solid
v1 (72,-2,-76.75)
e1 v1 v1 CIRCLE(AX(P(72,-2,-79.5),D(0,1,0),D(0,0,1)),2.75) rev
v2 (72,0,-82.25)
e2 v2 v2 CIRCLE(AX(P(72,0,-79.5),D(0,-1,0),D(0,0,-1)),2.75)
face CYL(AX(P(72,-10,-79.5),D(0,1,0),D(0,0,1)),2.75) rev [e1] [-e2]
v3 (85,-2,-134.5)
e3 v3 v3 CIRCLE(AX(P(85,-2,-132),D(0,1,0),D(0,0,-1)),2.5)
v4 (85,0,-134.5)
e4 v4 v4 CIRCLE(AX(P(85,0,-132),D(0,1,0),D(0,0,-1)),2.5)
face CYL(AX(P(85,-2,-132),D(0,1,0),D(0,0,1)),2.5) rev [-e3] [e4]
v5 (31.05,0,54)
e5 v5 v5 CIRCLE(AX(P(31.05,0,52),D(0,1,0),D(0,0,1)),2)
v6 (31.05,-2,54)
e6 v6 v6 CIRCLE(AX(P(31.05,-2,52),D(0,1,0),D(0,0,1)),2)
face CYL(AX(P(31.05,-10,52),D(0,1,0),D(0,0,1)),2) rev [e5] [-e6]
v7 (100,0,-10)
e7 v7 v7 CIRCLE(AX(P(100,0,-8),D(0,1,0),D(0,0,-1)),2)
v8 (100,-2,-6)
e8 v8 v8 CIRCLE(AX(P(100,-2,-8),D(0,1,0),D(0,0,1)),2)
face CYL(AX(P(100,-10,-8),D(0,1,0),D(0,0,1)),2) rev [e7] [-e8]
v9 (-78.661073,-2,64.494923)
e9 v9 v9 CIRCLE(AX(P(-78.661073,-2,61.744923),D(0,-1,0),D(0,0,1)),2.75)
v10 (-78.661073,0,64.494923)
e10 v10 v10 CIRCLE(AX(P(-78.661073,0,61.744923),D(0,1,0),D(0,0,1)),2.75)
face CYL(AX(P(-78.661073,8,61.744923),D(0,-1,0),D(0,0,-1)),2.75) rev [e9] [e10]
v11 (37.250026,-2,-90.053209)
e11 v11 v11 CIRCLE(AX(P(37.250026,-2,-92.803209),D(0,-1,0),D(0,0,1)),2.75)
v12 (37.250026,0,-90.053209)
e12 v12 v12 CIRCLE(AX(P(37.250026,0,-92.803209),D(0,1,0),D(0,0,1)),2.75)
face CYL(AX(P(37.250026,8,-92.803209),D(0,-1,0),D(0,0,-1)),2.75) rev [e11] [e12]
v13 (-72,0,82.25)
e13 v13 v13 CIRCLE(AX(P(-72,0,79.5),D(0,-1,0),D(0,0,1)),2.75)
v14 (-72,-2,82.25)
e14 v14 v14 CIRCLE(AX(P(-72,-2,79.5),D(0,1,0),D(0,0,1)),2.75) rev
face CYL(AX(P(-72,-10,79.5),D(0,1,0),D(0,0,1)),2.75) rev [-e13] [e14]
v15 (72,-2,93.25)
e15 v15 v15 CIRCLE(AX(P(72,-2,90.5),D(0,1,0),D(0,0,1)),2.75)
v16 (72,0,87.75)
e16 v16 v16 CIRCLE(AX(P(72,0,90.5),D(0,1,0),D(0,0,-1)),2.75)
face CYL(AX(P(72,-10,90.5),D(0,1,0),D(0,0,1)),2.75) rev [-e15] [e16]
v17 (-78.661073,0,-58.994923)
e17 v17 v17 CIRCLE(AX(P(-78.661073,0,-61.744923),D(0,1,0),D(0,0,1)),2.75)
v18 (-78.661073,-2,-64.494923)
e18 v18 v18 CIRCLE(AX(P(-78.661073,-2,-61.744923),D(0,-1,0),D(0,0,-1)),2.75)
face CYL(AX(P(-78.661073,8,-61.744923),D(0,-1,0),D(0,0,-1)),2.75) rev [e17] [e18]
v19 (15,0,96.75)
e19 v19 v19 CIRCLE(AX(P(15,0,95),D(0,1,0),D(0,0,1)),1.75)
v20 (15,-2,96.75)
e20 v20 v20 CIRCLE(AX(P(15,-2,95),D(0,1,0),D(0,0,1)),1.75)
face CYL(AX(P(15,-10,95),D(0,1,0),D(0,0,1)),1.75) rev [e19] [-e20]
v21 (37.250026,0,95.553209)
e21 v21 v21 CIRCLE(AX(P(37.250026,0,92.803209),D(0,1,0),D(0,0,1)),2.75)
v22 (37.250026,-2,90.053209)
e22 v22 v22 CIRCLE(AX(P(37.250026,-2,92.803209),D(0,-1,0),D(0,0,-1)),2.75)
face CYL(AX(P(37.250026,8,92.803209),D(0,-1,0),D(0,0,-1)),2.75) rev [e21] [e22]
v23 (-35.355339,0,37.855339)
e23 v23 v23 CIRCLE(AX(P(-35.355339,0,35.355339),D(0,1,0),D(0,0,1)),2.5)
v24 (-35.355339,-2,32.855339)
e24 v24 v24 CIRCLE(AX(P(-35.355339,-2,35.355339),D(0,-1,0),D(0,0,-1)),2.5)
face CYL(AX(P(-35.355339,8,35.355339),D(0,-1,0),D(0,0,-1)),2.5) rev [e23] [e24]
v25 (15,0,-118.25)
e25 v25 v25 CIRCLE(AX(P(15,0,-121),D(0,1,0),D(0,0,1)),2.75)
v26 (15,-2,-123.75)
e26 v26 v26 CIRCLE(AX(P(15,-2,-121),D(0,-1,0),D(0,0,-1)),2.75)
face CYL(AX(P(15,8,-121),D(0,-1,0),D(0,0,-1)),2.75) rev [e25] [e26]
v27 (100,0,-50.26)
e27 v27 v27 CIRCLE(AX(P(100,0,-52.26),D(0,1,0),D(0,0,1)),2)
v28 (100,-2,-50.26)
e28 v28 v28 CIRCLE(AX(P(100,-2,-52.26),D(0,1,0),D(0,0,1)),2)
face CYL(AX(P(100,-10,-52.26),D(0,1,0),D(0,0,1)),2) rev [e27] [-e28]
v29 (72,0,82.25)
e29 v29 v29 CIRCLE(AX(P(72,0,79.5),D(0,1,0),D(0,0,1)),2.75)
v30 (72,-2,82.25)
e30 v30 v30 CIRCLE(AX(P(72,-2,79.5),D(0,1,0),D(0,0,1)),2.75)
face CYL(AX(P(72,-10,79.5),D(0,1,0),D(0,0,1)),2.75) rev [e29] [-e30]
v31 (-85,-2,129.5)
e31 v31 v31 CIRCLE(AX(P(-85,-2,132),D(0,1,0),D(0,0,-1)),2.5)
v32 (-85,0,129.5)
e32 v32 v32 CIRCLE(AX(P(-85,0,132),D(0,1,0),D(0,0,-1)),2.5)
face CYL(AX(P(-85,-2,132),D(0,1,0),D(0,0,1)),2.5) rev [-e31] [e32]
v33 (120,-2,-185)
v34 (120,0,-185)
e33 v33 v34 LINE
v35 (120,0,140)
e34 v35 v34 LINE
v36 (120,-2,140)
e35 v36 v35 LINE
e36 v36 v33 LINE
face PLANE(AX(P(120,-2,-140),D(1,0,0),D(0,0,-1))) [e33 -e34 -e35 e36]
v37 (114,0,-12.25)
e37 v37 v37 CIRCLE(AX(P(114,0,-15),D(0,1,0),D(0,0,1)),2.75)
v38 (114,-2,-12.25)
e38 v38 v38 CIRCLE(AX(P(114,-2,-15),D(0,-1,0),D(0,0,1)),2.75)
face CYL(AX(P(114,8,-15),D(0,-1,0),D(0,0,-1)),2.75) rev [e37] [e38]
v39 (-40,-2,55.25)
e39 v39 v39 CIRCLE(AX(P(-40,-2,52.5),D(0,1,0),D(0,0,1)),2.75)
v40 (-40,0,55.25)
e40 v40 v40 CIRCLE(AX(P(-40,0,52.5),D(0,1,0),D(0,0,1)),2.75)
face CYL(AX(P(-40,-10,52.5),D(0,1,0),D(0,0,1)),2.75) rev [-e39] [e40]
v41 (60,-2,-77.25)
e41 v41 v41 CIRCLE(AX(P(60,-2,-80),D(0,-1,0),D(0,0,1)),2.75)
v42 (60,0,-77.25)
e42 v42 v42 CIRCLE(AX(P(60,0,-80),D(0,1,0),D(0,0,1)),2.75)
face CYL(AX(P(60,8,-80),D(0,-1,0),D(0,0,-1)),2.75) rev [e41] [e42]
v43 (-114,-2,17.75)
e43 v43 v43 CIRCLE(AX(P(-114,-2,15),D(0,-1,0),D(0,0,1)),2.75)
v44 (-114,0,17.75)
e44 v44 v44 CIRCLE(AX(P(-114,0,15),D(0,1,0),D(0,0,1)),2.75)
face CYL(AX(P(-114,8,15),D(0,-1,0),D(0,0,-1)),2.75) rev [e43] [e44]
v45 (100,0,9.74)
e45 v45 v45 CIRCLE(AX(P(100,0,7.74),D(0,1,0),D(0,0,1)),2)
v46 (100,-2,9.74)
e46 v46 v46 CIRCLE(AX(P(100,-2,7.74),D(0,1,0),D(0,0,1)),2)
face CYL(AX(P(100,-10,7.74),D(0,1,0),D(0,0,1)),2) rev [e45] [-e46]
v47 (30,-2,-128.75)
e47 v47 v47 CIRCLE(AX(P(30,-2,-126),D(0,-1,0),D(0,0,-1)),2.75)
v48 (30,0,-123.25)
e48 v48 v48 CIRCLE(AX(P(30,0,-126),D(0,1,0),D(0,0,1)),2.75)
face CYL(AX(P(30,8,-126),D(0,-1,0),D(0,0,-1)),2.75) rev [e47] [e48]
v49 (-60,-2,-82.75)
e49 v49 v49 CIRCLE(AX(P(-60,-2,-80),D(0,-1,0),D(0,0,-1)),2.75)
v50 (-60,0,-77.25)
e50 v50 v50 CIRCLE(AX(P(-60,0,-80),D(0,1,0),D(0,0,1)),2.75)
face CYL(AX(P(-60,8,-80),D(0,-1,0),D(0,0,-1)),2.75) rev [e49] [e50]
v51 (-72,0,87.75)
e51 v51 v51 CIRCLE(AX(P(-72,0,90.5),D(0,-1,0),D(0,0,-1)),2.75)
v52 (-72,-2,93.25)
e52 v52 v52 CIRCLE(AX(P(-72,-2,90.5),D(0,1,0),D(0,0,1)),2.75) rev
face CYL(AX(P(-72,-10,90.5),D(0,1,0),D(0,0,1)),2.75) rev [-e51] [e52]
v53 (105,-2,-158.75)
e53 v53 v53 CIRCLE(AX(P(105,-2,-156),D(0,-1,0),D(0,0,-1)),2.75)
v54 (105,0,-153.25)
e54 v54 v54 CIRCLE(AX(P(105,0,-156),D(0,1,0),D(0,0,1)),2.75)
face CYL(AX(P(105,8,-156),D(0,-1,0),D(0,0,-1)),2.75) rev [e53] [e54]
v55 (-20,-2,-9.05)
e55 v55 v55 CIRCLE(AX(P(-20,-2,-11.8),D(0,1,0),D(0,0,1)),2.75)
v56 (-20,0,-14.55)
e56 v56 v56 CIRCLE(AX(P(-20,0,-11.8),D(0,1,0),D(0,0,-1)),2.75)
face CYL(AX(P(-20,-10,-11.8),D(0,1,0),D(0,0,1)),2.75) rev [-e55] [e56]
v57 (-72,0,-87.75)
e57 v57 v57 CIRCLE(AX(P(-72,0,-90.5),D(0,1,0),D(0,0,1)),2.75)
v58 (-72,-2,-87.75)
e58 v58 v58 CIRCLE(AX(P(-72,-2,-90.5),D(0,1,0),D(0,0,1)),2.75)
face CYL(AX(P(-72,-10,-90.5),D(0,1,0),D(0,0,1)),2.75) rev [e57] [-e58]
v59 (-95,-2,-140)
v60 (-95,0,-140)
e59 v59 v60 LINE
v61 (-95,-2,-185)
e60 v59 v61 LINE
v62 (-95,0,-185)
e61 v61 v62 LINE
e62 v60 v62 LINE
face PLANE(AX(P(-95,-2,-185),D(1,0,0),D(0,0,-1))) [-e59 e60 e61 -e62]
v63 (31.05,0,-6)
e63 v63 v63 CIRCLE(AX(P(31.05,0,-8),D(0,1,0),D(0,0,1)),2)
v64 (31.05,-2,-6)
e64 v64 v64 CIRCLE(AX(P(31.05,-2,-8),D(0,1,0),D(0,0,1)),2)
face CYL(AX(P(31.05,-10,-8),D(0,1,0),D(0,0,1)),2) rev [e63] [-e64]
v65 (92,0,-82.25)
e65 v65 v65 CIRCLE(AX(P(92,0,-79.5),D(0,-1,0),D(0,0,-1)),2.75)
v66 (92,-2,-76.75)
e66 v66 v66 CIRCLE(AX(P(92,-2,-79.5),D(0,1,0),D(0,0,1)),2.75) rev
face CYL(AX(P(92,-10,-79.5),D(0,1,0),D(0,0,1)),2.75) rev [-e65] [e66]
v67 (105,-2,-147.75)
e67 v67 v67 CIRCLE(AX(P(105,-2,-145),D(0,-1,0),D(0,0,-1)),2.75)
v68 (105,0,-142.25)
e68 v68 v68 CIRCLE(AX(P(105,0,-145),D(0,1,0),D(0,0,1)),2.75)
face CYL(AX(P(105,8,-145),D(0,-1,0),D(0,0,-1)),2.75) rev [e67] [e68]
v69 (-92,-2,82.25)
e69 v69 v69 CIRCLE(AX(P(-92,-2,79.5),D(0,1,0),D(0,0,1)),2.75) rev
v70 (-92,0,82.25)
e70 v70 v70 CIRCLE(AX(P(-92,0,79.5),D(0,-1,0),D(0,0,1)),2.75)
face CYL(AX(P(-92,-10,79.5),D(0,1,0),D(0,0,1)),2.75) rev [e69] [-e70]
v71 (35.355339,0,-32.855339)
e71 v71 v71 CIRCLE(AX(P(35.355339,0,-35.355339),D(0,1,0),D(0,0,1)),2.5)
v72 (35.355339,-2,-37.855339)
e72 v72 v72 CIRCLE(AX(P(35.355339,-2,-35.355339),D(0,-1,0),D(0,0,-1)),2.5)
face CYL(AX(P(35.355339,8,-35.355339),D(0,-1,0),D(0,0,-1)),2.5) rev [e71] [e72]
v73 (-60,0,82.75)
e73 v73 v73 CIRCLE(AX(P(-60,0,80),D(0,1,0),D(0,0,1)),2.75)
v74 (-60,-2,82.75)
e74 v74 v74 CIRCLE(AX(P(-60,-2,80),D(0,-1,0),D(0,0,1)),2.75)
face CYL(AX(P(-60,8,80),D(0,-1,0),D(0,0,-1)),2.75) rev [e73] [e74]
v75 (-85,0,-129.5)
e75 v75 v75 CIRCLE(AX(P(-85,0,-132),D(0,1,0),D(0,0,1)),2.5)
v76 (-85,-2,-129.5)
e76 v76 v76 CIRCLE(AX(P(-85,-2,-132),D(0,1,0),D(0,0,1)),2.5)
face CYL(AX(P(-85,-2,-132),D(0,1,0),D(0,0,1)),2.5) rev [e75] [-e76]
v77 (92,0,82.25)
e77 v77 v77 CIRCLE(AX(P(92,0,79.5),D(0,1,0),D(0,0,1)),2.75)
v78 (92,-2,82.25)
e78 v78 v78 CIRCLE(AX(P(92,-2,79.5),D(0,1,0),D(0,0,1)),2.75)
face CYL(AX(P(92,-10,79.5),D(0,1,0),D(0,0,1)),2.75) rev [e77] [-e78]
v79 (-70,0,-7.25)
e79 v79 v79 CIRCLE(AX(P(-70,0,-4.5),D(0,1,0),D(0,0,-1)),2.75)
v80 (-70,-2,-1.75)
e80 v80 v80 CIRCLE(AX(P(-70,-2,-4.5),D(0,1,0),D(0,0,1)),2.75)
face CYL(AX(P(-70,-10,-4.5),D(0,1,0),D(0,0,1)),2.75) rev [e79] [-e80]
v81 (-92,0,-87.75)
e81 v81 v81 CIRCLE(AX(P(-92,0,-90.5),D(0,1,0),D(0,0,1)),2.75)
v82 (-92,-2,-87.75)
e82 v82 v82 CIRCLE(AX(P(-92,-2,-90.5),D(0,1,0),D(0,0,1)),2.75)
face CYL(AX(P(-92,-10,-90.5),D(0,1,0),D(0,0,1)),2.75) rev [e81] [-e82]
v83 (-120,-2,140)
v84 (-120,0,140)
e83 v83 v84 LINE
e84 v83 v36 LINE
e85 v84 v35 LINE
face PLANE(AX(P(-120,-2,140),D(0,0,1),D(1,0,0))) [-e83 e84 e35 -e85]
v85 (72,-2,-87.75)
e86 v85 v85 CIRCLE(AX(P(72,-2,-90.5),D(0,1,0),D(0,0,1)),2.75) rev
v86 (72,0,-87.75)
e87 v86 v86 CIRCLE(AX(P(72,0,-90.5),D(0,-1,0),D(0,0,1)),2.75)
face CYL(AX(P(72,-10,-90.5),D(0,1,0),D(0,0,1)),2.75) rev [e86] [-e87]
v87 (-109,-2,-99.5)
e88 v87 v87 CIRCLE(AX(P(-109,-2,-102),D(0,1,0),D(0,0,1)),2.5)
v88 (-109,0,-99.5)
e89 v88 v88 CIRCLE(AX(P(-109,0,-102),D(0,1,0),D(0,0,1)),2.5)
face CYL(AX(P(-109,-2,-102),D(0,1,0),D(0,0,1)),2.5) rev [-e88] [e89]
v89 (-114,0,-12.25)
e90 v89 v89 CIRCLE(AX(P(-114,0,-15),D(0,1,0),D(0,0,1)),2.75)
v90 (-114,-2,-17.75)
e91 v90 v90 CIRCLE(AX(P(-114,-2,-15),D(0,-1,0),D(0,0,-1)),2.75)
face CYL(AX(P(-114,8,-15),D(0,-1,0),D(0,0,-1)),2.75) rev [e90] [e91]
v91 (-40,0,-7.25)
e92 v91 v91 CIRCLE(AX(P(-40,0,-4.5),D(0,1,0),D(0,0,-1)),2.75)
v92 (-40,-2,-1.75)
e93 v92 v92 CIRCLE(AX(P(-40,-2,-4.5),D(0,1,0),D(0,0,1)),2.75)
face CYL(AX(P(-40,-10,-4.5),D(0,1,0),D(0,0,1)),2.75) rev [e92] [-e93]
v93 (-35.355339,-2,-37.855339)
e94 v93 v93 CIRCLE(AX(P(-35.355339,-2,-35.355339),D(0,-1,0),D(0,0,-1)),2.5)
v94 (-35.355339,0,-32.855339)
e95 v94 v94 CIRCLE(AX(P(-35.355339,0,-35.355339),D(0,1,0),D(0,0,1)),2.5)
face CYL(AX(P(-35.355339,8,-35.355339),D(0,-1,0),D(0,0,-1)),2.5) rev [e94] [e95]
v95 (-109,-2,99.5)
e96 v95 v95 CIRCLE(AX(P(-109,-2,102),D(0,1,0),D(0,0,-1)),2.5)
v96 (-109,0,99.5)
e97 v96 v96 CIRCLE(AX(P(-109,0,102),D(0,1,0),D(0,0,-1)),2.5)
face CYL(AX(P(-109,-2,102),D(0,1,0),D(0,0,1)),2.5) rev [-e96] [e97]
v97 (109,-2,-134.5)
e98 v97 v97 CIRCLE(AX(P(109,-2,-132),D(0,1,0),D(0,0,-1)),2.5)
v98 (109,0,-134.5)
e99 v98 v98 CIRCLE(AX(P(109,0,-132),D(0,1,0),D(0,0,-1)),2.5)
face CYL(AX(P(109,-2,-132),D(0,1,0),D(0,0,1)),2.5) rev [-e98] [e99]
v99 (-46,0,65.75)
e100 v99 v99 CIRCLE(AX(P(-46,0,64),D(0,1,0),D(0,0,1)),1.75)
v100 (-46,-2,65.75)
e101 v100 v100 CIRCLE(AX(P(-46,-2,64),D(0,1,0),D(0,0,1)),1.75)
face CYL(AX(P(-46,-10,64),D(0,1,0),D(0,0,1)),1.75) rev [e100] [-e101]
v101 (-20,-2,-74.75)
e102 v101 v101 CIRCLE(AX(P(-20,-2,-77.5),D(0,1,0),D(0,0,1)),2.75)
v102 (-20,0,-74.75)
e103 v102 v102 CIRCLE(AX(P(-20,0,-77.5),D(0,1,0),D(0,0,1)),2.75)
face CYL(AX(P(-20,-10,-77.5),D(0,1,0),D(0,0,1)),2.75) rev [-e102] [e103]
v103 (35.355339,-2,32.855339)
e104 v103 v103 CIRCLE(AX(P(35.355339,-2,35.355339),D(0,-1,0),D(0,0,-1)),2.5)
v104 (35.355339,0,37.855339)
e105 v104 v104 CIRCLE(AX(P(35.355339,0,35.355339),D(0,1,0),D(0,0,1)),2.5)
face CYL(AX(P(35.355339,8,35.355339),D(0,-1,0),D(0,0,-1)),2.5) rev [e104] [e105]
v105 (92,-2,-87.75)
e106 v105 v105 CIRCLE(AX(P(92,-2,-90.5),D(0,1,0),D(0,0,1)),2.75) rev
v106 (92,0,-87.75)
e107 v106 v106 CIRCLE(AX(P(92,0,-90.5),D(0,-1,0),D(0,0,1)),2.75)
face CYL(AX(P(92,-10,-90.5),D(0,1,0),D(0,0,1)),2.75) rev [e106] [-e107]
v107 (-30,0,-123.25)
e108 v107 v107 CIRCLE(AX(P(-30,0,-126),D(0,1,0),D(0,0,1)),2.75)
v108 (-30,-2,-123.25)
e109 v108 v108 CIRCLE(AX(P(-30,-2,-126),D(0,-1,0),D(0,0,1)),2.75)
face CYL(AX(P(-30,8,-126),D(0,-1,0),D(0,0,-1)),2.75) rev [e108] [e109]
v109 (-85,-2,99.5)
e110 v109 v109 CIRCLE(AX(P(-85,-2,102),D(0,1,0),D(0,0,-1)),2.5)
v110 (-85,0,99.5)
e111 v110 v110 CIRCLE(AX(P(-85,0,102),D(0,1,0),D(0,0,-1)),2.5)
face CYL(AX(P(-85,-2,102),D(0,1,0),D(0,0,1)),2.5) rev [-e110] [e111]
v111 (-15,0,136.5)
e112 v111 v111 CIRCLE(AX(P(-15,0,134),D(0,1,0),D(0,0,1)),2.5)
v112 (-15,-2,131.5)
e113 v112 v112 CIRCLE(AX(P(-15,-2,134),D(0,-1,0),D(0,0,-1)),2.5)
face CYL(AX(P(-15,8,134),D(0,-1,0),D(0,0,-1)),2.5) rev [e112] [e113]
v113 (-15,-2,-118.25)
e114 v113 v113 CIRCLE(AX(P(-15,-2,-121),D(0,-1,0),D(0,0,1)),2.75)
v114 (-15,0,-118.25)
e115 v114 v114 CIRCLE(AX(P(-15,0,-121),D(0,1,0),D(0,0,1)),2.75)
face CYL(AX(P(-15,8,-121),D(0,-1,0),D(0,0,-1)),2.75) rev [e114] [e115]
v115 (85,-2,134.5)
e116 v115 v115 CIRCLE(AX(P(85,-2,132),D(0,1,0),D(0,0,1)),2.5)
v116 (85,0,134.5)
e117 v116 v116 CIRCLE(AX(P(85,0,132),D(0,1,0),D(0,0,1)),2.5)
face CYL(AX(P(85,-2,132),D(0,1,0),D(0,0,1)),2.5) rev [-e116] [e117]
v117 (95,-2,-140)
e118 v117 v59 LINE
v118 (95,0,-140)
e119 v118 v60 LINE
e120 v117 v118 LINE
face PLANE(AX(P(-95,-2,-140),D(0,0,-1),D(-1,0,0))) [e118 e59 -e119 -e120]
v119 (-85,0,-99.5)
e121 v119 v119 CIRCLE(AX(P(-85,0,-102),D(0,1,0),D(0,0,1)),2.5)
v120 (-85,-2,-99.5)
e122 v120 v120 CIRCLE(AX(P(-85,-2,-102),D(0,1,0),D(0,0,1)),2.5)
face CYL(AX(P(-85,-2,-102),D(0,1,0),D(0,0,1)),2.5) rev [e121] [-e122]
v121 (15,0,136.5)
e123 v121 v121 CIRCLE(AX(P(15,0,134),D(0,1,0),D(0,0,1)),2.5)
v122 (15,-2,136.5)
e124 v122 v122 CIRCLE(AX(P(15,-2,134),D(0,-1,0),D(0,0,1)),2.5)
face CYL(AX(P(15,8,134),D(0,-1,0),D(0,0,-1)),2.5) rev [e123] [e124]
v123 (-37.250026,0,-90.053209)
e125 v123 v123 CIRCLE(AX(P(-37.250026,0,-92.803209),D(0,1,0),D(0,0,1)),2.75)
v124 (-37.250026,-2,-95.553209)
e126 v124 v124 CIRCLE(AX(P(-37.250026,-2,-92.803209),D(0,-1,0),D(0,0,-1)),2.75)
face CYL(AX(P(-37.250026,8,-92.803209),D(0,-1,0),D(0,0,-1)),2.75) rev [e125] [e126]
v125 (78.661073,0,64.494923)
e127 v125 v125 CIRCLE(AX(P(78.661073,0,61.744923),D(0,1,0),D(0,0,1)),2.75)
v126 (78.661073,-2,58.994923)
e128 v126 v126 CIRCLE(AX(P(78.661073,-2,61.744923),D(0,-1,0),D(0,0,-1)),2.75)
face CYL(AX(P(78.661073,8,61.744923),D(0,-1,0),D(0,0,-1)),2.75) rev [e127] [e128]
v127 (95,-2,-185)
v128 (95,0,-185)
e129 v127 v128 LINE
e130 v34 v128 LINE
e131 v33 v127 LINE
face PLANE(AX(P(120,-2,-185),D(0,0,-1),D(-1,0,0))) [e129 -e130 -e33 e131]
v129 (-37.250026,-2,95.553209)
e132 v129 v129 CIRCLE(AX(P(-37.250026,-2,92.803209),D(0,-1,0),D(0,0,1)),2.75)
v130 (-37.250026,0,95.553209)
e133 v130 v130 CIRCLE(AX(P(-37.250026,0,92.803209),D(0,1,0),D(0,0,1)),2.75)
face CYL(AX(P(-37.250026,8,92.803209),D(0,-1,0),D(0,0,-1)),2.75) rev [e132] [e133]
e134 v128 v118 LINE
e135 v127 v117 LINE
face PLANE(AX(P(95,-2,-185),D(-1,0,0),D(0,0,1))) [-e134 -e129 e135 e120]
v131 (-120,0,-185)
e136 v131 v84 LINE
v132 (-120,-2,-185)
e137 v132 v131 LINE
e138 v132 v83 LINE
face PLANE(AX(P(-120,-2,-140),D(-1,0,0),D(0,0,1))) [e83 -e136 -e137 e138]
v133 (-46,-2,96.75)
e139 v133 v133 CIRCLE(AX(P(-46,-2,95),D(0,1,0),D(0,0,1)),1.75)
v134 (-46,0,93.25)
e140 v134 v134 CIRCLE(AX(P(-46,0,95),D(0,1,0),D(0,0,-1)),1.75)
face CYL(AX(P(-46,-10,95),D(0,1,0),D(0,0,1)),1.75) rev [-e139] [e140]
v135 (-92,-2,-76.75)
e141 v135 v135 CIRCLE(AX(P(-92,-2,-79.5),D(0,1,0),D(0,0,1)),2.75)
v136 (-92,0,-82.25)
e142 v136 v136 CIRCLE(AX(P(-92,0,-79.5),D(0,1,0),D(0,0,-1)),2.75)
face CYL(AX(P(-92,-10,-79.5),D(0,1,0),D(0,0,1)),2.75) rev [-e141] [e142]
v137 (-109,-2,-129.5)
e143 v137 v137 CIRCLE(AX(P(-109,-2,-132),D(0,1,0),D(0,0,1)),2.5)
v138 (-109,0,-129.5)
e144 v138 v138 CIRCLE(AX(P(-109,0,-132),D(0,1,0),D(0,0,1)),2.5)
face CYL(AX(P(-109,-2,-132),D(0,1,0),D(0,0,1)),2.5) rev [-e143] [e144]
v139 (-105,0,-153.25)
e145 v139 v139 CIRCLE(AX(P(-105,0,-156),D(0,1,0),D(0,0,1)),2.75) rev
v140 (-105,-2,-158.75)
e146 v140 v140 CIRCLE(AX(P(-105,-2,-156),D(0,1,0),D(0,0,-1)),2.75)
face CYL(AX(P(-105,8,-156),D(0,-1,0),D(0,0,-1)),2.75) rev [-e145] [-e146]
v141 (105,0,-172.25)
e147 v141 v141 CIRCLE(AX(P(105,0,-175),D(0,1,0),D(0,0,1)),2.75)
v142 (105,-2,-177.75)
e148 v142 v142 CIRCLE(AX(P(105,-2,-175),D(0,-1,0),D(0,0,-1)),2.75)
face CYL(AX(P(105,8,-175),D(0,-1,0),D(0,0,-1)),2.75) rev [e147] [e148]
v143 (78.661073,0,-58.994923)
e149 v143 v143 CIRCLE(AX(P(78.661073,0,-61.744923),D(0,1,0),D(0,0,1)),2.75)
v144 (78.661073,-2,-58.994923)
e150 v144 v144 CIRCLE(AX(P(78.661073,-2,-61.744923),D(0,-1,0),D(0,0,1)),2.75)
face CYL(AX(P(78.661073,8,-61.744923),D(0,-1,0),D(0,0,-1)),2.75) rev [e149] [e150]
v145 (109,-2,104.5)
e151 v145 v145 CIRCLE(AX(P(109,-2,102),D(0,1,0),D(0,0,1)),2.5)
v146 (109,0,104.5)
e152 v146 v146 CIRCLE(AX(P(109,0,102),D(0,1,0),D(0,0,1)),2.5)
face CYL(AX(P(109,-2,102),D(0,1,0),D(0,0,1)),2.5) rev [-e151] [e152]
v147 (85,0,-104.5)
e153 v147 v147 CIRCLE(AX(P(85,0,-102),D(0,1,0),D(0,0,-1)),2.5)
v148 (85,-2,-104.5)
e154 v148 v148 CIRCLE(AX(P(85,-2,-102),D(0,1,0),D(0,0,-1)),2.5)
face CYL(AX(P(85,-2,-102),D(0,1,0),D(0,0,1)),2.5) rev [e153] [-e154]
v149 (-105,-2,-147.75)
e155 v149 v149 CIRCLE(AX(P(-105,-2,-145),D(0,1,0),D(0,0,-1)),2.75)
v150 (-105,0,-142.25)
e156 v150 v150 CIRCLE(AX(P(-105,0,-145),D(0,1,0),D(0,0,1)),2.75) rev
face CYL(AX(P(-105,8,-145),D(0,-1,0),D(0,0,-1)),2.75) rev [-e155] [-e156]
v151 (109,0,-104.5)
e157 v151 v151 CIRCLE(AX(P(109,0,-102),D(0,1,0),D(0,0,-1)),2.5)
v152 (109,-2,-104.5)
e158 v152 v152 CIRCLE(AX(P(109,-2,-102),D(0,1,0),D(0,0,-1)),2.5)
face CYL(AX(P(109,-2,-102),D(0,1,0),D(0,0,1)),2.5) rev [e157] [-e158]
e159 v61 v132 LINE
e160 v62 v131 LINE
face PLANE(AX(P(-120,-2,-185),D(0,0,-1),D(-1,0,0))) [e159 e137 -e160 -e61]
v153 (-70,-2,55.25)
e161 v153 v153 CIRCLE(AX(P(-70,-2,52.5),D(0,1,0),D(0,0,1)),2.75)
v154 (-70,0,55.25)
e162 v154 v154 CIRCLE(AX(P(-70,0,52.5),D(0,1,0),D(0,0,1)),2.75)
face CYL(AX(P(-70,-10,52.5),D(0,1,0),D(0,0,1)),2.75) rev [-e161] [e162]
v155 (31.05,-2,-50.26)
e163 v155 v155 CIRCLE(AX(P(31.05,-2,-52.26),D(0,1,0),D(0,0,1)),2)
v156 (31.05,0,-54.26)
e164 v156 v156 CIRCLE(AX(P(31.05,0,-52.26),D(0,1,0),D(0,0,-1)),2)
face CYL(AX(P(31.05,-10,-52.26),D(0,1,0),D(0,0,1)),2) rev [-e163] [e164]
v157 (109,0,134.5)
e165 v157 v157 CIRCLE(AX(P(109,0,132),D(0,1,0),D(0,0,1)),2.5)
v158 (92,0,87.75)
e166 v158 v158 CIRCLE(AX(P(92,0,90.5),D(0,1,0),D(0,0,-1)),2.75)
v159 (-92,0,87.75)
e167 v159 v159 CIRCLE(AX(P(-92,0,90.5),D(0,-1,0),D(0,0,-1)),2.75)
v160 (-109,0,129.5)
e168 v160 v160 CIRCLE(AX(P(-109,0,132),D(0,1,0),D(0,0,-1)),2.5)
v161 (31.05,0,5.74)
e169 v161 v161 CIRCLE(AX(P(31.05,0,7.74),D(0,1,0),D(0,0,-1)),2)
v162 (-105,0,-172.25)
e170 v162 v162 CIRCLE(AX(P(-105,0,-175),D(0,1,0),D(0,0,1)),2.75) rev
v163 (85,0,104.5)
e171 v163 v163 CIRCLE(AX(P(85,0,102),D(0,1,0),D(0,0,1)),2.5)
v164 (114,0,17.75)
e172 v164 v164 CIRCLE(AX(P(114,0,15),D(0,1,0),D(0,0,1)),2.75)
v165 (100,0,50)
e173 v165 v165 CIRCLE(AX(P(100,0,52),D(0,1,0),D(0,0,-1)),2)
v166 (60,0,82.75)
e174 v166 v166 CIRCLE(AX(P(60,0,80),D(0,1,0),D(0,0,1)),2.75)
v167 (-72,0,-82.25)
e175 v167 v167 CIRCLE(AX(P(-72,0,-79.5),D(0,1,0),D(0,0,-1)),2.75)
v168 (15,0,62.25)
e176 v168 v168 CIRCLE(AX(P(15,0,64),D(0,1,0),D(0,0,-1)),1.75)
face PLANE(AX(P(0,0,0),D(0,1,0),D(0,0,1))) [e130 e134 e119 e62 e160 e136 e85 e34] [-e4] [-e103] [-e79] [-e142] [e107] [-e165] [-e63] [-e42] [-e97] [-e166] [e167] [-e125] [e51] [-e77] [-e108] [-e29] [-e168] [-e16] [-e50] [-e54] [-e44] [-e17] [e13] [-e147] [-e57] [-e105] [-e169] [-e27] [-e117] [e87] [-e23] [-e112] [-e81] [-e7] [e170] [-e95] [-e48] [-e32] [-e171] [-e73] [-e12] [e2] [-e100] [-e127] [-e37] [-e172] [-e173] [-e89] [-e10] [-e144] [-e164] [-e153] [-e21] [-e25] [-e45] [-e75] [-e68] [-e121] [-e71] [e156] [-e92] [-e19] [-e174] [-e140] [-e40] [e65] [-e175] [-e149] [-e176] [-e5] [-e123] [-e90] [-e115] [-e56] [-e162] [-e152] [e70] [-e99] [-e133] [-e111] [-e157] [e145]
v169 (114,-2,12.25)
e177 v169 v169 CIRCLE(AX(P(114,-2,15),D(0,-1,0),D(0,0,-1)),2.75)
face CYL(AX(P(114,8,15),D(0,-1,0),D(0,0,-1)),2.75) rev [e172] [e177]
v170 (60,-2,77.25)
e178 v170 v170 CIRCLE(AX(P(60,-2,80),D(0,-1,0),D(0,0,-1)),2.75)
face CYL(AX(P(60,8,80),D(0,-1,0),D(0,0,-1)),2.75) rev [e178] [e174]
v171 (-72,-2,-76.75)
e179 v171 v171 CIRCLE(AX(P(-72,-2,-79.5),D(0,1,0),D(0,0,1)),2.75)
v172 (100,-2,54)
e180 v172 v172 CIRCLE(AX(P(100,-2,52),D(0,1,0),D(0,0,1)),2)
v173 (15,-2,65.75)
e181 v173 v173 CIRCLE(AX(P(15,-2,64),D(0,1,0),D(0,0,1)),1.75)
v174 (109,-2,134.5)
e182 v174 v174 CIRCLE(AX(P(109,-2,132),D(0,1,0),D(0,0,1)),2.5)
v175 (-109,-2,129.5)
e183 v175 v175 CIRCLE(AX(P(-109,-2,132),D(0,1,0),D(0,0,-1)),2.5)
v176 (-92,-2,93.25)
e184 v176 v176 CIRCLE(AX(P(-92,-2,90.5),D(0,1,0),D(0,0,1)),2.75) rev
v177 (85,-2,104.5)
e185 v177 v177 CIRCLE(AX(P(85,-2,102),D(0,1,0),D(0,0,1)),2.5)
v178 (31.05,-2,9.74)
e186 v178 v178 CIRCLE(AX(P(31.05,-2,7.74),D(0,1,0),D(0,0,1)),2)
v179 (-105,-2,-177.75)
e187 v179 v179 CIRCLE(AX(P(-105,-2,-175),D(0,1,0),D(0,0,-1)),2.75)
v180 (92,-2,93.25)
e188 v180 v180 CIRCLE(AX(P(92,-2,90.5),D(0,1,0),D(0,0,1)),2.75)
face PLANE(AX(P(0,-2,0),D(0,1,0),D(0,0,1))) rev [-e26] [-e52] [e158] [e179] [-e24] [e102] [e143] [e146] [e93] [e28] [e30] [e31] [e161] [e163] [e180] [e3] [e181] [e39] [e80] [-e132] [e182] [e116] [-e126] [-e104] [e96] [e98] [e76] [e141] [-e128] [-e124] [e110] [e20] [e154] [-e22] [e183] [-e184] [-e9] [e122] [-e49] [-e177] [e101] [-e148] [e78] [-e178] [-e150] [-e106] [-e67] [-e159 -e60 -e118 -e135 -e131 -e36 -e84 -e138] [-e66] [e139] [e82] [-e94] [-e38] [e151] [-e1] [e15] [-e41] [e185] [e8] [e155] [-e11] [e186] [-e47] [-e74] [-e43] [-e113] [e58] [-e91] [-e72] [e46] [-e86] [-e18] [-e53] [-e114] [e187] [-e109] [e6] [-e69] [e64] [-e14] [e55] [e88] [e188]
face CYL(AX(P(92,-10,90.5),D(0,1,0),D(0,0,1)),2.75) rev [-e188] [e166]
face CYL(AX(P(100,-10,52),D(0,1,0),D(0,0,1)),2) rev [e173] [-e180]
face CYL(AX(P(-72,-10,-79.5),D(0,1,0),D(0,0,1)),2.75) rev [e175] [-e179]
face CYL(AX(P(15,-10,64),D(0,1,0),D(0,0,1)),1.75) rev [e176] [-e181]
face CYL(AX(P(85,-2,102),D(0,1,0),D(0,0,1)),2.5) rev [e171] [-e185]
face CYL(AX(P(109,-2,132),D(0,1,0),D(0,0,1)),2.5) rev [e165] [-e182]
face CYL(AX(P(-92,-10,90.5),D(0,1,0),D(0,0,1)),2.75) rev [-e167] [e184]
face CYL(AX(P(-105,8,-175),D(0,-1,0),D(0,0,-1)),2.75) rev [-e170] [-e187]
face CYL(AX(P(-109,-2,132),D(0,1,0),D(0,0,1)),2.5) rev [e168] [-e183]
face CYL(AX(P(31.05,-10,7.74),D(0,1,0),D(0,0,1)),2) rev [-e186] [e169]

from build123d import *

# Parameters (mm, degrees)
SM_BASE_FLANGE_2_DEPTH   = 2
SKETCH_26_R              = 2.5
CUT_EXTRUDE_1_DEPTH      = 221.519840377
SKETCH_27_R              = 2.5
CUT_EXTRUDE_2_DEPTH      = 10
SKETCH_28_R              = 2.75
CUT_EXTRUDE_3_DEPTH      = 10
SKETCH_29_R              = 2.75
CUT_EXTRUDE_4_DEPTH      = 10
SKETCH_30_R              = 2.75
CUT_EXTRUDE_5_DEPTH      = 10
MIRROR_3_COPY_1_SKETCH_R = 2.75
MIRROR_3_COPY_1_DEPTH    = 10
SKETCH_31_R              = 2
CUT_EXTRUDE_6_DEPTH      = 10
PATTERN_LINEAR_1_COUNT   = 2
PATTERN_LINEAR_1_PITCH   = 60
SKETCH_32_R              = 2.75
CUT_EXTRUDE_7_DEPTH      = 10
SKETCH_33_R              = 2.75
CUT_EXTRUDE_8_DEPTH      = 10
SKETCH_34_R              = 1.75
CUT_EXTRUDE_9_DEPTH      = 10
SKETCH_35_R              = 2.75
CUT_EXTRUDE_10_DEPTH     = 10
SKETCH_36_R              = 2.75
SKETCH_36_R_2            = 2.5
CUT_EXTRUDE_11_DEPTH     = 10


# Sheet-metal steps are written as plain solids
with BuildPart() as part:
    # 草图2 → 基体-法兰2 (new body)
    with BuildSketch(Plane(origin=(0, 0, 0), x_dir=(1, 0, 0), z_dir=(0, 1, 0))):
        Polygon((-120, 140), (-120, 185), (-95, 185), (-95, 140), (95, 140), (95, 185), (120, 185), (120, 140), (120, -140), (-120, -140), align=None)
    extrude(amount=-SM_BASE_FLANGE_2_DEPTH)

    # 草图26 → 切除-拉伸1 (cut, through all)
    with BuildSketch(Plane(origin=(0, 0, 0), x_dir=(1, 0, 0), z_dir=(0, 1, 0))):
        with Locations(Location((-109, 102, 0), (0, 0, 270))):
            Circle(SKETCH_26_R)
        with Locations(Location((-109, 132, 0), (0, 0, 270))):
            Circle(SKETCH_26_R)
        with Locations(Location((-85, 132, 0), (0, 0, 270))):
            Circle(SKETCH_26_R)
        with Locations(Location((-85, 102, 0), (0, 0, 270))):
            Circle(SKETCH_26_R)
        with Locations(Location((-85, -102, 0), (0, 0, 90))):
            Circle(SKETCH_26_R)
        with Locations(Location((-85, -132, 0), (0, 0, 90))):
            Circle(SKETCH_26_R)
        with Locations(Location((-109, -132, 0), (0, 0, 90))):
            Circle(SKETCH_26_R)
        with Locations(Location((-109, -102, 0), (0, 0, 90))):
            Circle(SKETCH_26_R)
        with Locations(Location((85, 102, 0), (0, 0, 90))):
            Circle(SKETCH_26_R)
        with Locations(Location((85, 132, 0), (0, 0, 90))):
            Circle(SKETCH_26_R)
        with Locations(Location((109, 132, 0), (0, 0, 90))):
            Circle(SKETCH_26_R)
        with Locations(Location((109, 102, 0), (0, 0, 90))):
            Circle(SKETCH_26_R)
        with Locations(Location((109, -102, 0), (0, 0, 270))):
            Circle(SKETCH_26_R)
        with Locations(Location((109, -132, 0), (0, 0, 270))):
            Circle(SKETCH_26_R)
        with Locations(Location((85, -132, 0), (0, 0, 270))):
            Circle(SKETCH_26_R)
        with Locations(Location((85, -102, 0), (0, 0, 270))):
            Circle(SKETCH_26_R)
    extrude(amount=-CUT_EXTRUDE_1_DEPTH, mode=Mode.SUBTRACT)

    # 草图27 → 切除-拉伸2 (cut)
    with BuildSketch(Plane.XZ.offset(2)):
        with Locations(Location((-35.355339059, 35.355339059, 0), (0, 0, 270))):
            Circle(SKETCH_27_R)
        with Locations(Location((35.355339059, 35.355339059, 0), (0, 0, 270))):
            Circle(SKETCH_27_R)
        with Locations(Location((35.355339059, -35.355339059, 0), (0, 0, 270))):
            Circle(SKETCH_27_R)
        with Locations(Location((-35.355339059, -35.355339059, 0), (0, 0, 270))):
            Circle(SKETCH_27_R)
    extrude(amount=-CUT_EXTRUDE_2_DEPTH, mode=Mode.SUBTRACT)

    # 草图28 → 切除-拉伸3 (cut)
    with BuildSketch(Plane.XZ.offset(2)):
        with Locations(Location((-60, -80, 0), (0, 0, 270))):
            Circle(SKETCH_28_R)
        with Locations(Location((-37.250025969, -92.803208809, 0), (0, 0, 270))):
            Circle(SKETCH_28_R)
        with Locations(Location((-78.661073186, -61.744923397, 0), (0, 0, 270))):
            Circle(SKETCH_28_R)
        with Locations(Location((78.661073186, -61.744923397, 0), (0, 0, 90))):
            Circle(SKETCH_28_R)
        with Locations(Location((37.250025969, -92.803208809, 0), (0, 0, 90))):
            Circle(SKETCH_28_R)
        with Locations(Location((60, -80, 0), (0, 0, 90))):
            Circle(SKETCH_28_R)
        with Locations(Location((-78.661073186, 61.744923397, 0), (0, 0, 90))):
            Circle(SKETCH_28_R)
        with Locations(Location((-37.250025969, 92.803208809, 0), (0, 0, 90))):
            Circle(SKETCH_28_R)
        with Locations(Location((-60, 80, 0), (0, 0, 90))):
            Circle(SKETCH_28_R)
        with Locations(Location((60, 80, 0), (0, 0, 270))):
            Circle(SKETCH_28_R)
        with Locations(Location((37.250025969, 92.803208809, 0), (0, 0, 270))):
            Circle(SKETCH_28_R)
        with Locations(Location((78.661073186, 61.744923397, 0), (0, 0, 270))):
            Circle(SKETCH_28_R)
    extrude(amount=-CUT_EXTRUDE_3_DEPTH, mode=Mode.SUBTRACT)

    # 草图29 → 切除-拉伸4 (cut)
    with BuildSketch(Plane.XZ.offset(2)):
        with Locations(Location((105, -175, 0), (0, 0, 270))):
            Circle(SKETCH_29_R)
        with Locations(Location((105, -156, 0), (0, 0, 270))):
            Circle(SKETCH_29_R)
        with Locations(Location((105, -145, 0), (0, 0, 270))):
            Circle(SKETCH_29_R)
    cut_extrude_4 = extrude(amount=-CUT_EXTRUDE_4_DEPTH, mode=Mode.SUBTRACT)

    # 镜向1: 切除-拉伸4 across plane
    add(cut_extrude_4.mirror(Plane(origin=(0, 0, 0), x_dir=(0, 0, 1), z_dir=(1, 0, 0))), mode=Mode.SUBTRACT)

    # 草图30 → 切除-拉伸5 (cut)
    with BuildSketch(Plane(origin=(0, 0, 0), x_dir=(1, 0, 0), z_dir=(0, 1, 0))):
        with Locations(Location((-92, 90.5, 0), (0, 0, 270))):
            Circle(SKETCH_30_R)
        with Locations(Location((-92, 79.5, 0), (0, 0, 270))):
            Circle(SKETCH_30_R)
        with Locations(Location((-72, 79.5, 0), (0, 0, 270))):
            Circle(SKETCH_30_R)
        with Locations(Location((-72, 90.5, 0), (0, 0, 270))):
            Circle(SKETCH_30_R)
    cut_extrude_5 = extrude(amount=-CUT_EXTRUDE_5_DEPTH, mode=Mode.SUBTRACT)

    # 镜向2: 切除-拉伸5 across plane
    add(cut_extrude_5.mirror(Plane.XY), mode=Mode.SUBTRACT)

    # 镜向3: 切除-拉伸5 across plane
    add(cut_extrude_5.mirror(Plane(origin=(0, 0, 0), x_dir=(0, 0, 1), z_dir=(1, 0, 0))), mode=Mode.SUBTRACT)

    # 镜向3 copy 1 sketch → 镜向3 copy 1 (cut)
    with BuildSketch(Plane(origin=(0, 0, 0), x_dir=(-1, 0, 0), z_dir=(0, 1, 0))):
        with Locations(Location((-92, 90.5, 0), (0, 0, 270))):
            Circle(MIRROR_3_COPY_1_SKETCH_R)
        with Locations(Location((-92, 79.5, 0), (0, 0, 270))):
            Circle(MIRROR_3_COPY_1_SKETCH_R)
        with Locations(Location((-72, 79.5, 0), (0, 0, 270))):
            Circle(MIRROR_3_COPY_1_SKETCH_R)
        with Locations(Location((-72, 90.5, 0), (0, 0, 270))):
            Circle(MIRROR_3_COPY_1_SKETCH_R)
    extrude(amount=-MIRROR_3_COPY_1_DEPTH, mode=Mode.SUBTRACT)

    # 草图31 → 切除-拉伸6 (cut)
    with BuildSketch(Plane(origin=(0, 0, 0), x_dir=(1, 0, 0), z_dir=(0, 1, 0))):
        with Locations(Location((31.05, -52, 0), (0, 0, 270))):
            Circle(SKETCH_31_R)
        with Locations(Location((31.05, -7.74, 0), (0, 0, 270))):
            Circle(SKETCH_31_R)
        with Locations(Location((100, -7.74, 0), (0, 0, 270))):
            Circle(SKETCH_31_R)
        with Locations(Location((100, -52, 0), (0, 0, 270))):
            Circle(SKETCH_31_R)
    cut_extrude_6 = extrude(amount=-CUT_EXTRUDE_6_DEPTH, mode=Mode.SUBTRACT)

    # 阵列(线性)1: 切除-拉伸6 ×2
    with Locations(*[(0, 0, -i * PATTERN_LINEAR_1_PITCH) for i in range(1, PATTERN_LINEAR_1_COUNT)]):
        add(cut_extrude_6, mode=Mode.SUBTRACT)

    # 草图32 → 切除-拉伸7 (cut)
    with BuildSketch(Plane(origin=(0, 0, 0), x_dir=(1, 0, 0), z_dir=(0, 1, 0))):
        with Locations(Location((-20, 77.5, 0), (0, 0, 270))):
            Circle(SKETCH_32_R)
        with Locations(Location((-20, 11.8, 0), (0, 0, 270))):
            Circle(SKETCH_32_R)
    extrude(amount=-CUT_EXTRUDE_7_DEPTH, mode=Mode.SUBTRACT)

    # 草图33 → 切除-拉伸8 (cut)
    with BuildSketch(Plane(origin=(0, 0, 0), x_dir=(1, 0, 0), z_dir=(0, 1, 0))):
        with Locations(Location((-70, -52.5, 0), (0, 0, 270))):
            Circle(SKETCH_33_R)
        with Locations(Location((-70, 4.5, 0), (0, 0, 270))):
            Circle(SKETCH_33_R)
        with Locations(Location((-40, 4.5, 0), (0, 0, 270))):
            Circle(SKETCH_33_R)
        with Locations(Location((-40, -52.5, 0), (0, 0, 270))):
            Circle(SKETCH_33_R)
    extrude(amount=-CUT_EXTRUDE_8_DEPTH, mode=Mode.SUBTRACT)

    # 草图34 → 切除-拉伸9 (cut)
    with BuildSketch(Plane(origin=(0, 0, 0), x_dir=(1, 0, 0), z_dir=(0, 1, 0))):
        with Locations(Location((15, -95, 0), (0, 0, 270))):
            Circle(SKETCH_34_R)
        with Locations(Location((15, -64, 0), (0, 0, 270))):
            Circle(SKETCH_34_R)
        with Locations(Location((-46, -64, 0), (0, 0, 270))):
            Circle(SKETCH_34_R)
        with Locations(Location((-46, -95, 0), (0, 0, 270))):
            Circle(SKETCH_34_R)
    extrude(amount=-CUT_EXTRUDE_9_DEPTH, mode=Mode.SUBTRACT)

    # 草图35 → 切除-拉伸10 (cut)
    with BuildSketch(Plane.XZ.offset(2)):
        with Locations(Location((30, -126, 0), (0, 0, 270))):
            Circle(SKETCH_35_R)
        with Locations(Location((-30, -126, 0), (0, 0, 90))):
            Circle(SKETCH_35_R)
    extrude(amount=-CUT_EXTRUDE_10_DEPTH, mode=Mode.SUBTRACT)

    # 草图36 → 切除-拉伸11 (cut)
    with BuildSketch(Plane.XZ.offset(2)):
        with Locations(Location((-114, -15, 0), (0, 0, 270))):
            Circle(SKETCH_36_R)
        with Locations(Location((-114, 15, 0), (0, 0, 90))):
            Circle(SKETCH_36_R)
        with Locations(Location((114, -15, 0), (0, 0, 90))):
            Circle(SKETCH_36_R)
        with Locations(Location((114, 15, 0), (0, 0, 270))):
            Circle(SKETCH_36_R)
        with Locations(Location((15, 134, 0), (0, 0, 90))):
            Circle(SKETCH_36_R_2)
        with Locations(Location((-15, 134, 0), (0, 0, 270))):
            Circle(SKETCH_36_R_2)
        with Locations(Location((15, -121, 0), (0, 0, 270))):
            Circle(SKETCH_36_R)
        with Locations(Location((-15, -121, 0), (0, 0, 90))):
            Circle(SKETCH_36_R)
    extrude(amount=-CUT_EXTRUDE_11_DEPTH, mode=Mode.SUBTRACT)


solid = part.part
